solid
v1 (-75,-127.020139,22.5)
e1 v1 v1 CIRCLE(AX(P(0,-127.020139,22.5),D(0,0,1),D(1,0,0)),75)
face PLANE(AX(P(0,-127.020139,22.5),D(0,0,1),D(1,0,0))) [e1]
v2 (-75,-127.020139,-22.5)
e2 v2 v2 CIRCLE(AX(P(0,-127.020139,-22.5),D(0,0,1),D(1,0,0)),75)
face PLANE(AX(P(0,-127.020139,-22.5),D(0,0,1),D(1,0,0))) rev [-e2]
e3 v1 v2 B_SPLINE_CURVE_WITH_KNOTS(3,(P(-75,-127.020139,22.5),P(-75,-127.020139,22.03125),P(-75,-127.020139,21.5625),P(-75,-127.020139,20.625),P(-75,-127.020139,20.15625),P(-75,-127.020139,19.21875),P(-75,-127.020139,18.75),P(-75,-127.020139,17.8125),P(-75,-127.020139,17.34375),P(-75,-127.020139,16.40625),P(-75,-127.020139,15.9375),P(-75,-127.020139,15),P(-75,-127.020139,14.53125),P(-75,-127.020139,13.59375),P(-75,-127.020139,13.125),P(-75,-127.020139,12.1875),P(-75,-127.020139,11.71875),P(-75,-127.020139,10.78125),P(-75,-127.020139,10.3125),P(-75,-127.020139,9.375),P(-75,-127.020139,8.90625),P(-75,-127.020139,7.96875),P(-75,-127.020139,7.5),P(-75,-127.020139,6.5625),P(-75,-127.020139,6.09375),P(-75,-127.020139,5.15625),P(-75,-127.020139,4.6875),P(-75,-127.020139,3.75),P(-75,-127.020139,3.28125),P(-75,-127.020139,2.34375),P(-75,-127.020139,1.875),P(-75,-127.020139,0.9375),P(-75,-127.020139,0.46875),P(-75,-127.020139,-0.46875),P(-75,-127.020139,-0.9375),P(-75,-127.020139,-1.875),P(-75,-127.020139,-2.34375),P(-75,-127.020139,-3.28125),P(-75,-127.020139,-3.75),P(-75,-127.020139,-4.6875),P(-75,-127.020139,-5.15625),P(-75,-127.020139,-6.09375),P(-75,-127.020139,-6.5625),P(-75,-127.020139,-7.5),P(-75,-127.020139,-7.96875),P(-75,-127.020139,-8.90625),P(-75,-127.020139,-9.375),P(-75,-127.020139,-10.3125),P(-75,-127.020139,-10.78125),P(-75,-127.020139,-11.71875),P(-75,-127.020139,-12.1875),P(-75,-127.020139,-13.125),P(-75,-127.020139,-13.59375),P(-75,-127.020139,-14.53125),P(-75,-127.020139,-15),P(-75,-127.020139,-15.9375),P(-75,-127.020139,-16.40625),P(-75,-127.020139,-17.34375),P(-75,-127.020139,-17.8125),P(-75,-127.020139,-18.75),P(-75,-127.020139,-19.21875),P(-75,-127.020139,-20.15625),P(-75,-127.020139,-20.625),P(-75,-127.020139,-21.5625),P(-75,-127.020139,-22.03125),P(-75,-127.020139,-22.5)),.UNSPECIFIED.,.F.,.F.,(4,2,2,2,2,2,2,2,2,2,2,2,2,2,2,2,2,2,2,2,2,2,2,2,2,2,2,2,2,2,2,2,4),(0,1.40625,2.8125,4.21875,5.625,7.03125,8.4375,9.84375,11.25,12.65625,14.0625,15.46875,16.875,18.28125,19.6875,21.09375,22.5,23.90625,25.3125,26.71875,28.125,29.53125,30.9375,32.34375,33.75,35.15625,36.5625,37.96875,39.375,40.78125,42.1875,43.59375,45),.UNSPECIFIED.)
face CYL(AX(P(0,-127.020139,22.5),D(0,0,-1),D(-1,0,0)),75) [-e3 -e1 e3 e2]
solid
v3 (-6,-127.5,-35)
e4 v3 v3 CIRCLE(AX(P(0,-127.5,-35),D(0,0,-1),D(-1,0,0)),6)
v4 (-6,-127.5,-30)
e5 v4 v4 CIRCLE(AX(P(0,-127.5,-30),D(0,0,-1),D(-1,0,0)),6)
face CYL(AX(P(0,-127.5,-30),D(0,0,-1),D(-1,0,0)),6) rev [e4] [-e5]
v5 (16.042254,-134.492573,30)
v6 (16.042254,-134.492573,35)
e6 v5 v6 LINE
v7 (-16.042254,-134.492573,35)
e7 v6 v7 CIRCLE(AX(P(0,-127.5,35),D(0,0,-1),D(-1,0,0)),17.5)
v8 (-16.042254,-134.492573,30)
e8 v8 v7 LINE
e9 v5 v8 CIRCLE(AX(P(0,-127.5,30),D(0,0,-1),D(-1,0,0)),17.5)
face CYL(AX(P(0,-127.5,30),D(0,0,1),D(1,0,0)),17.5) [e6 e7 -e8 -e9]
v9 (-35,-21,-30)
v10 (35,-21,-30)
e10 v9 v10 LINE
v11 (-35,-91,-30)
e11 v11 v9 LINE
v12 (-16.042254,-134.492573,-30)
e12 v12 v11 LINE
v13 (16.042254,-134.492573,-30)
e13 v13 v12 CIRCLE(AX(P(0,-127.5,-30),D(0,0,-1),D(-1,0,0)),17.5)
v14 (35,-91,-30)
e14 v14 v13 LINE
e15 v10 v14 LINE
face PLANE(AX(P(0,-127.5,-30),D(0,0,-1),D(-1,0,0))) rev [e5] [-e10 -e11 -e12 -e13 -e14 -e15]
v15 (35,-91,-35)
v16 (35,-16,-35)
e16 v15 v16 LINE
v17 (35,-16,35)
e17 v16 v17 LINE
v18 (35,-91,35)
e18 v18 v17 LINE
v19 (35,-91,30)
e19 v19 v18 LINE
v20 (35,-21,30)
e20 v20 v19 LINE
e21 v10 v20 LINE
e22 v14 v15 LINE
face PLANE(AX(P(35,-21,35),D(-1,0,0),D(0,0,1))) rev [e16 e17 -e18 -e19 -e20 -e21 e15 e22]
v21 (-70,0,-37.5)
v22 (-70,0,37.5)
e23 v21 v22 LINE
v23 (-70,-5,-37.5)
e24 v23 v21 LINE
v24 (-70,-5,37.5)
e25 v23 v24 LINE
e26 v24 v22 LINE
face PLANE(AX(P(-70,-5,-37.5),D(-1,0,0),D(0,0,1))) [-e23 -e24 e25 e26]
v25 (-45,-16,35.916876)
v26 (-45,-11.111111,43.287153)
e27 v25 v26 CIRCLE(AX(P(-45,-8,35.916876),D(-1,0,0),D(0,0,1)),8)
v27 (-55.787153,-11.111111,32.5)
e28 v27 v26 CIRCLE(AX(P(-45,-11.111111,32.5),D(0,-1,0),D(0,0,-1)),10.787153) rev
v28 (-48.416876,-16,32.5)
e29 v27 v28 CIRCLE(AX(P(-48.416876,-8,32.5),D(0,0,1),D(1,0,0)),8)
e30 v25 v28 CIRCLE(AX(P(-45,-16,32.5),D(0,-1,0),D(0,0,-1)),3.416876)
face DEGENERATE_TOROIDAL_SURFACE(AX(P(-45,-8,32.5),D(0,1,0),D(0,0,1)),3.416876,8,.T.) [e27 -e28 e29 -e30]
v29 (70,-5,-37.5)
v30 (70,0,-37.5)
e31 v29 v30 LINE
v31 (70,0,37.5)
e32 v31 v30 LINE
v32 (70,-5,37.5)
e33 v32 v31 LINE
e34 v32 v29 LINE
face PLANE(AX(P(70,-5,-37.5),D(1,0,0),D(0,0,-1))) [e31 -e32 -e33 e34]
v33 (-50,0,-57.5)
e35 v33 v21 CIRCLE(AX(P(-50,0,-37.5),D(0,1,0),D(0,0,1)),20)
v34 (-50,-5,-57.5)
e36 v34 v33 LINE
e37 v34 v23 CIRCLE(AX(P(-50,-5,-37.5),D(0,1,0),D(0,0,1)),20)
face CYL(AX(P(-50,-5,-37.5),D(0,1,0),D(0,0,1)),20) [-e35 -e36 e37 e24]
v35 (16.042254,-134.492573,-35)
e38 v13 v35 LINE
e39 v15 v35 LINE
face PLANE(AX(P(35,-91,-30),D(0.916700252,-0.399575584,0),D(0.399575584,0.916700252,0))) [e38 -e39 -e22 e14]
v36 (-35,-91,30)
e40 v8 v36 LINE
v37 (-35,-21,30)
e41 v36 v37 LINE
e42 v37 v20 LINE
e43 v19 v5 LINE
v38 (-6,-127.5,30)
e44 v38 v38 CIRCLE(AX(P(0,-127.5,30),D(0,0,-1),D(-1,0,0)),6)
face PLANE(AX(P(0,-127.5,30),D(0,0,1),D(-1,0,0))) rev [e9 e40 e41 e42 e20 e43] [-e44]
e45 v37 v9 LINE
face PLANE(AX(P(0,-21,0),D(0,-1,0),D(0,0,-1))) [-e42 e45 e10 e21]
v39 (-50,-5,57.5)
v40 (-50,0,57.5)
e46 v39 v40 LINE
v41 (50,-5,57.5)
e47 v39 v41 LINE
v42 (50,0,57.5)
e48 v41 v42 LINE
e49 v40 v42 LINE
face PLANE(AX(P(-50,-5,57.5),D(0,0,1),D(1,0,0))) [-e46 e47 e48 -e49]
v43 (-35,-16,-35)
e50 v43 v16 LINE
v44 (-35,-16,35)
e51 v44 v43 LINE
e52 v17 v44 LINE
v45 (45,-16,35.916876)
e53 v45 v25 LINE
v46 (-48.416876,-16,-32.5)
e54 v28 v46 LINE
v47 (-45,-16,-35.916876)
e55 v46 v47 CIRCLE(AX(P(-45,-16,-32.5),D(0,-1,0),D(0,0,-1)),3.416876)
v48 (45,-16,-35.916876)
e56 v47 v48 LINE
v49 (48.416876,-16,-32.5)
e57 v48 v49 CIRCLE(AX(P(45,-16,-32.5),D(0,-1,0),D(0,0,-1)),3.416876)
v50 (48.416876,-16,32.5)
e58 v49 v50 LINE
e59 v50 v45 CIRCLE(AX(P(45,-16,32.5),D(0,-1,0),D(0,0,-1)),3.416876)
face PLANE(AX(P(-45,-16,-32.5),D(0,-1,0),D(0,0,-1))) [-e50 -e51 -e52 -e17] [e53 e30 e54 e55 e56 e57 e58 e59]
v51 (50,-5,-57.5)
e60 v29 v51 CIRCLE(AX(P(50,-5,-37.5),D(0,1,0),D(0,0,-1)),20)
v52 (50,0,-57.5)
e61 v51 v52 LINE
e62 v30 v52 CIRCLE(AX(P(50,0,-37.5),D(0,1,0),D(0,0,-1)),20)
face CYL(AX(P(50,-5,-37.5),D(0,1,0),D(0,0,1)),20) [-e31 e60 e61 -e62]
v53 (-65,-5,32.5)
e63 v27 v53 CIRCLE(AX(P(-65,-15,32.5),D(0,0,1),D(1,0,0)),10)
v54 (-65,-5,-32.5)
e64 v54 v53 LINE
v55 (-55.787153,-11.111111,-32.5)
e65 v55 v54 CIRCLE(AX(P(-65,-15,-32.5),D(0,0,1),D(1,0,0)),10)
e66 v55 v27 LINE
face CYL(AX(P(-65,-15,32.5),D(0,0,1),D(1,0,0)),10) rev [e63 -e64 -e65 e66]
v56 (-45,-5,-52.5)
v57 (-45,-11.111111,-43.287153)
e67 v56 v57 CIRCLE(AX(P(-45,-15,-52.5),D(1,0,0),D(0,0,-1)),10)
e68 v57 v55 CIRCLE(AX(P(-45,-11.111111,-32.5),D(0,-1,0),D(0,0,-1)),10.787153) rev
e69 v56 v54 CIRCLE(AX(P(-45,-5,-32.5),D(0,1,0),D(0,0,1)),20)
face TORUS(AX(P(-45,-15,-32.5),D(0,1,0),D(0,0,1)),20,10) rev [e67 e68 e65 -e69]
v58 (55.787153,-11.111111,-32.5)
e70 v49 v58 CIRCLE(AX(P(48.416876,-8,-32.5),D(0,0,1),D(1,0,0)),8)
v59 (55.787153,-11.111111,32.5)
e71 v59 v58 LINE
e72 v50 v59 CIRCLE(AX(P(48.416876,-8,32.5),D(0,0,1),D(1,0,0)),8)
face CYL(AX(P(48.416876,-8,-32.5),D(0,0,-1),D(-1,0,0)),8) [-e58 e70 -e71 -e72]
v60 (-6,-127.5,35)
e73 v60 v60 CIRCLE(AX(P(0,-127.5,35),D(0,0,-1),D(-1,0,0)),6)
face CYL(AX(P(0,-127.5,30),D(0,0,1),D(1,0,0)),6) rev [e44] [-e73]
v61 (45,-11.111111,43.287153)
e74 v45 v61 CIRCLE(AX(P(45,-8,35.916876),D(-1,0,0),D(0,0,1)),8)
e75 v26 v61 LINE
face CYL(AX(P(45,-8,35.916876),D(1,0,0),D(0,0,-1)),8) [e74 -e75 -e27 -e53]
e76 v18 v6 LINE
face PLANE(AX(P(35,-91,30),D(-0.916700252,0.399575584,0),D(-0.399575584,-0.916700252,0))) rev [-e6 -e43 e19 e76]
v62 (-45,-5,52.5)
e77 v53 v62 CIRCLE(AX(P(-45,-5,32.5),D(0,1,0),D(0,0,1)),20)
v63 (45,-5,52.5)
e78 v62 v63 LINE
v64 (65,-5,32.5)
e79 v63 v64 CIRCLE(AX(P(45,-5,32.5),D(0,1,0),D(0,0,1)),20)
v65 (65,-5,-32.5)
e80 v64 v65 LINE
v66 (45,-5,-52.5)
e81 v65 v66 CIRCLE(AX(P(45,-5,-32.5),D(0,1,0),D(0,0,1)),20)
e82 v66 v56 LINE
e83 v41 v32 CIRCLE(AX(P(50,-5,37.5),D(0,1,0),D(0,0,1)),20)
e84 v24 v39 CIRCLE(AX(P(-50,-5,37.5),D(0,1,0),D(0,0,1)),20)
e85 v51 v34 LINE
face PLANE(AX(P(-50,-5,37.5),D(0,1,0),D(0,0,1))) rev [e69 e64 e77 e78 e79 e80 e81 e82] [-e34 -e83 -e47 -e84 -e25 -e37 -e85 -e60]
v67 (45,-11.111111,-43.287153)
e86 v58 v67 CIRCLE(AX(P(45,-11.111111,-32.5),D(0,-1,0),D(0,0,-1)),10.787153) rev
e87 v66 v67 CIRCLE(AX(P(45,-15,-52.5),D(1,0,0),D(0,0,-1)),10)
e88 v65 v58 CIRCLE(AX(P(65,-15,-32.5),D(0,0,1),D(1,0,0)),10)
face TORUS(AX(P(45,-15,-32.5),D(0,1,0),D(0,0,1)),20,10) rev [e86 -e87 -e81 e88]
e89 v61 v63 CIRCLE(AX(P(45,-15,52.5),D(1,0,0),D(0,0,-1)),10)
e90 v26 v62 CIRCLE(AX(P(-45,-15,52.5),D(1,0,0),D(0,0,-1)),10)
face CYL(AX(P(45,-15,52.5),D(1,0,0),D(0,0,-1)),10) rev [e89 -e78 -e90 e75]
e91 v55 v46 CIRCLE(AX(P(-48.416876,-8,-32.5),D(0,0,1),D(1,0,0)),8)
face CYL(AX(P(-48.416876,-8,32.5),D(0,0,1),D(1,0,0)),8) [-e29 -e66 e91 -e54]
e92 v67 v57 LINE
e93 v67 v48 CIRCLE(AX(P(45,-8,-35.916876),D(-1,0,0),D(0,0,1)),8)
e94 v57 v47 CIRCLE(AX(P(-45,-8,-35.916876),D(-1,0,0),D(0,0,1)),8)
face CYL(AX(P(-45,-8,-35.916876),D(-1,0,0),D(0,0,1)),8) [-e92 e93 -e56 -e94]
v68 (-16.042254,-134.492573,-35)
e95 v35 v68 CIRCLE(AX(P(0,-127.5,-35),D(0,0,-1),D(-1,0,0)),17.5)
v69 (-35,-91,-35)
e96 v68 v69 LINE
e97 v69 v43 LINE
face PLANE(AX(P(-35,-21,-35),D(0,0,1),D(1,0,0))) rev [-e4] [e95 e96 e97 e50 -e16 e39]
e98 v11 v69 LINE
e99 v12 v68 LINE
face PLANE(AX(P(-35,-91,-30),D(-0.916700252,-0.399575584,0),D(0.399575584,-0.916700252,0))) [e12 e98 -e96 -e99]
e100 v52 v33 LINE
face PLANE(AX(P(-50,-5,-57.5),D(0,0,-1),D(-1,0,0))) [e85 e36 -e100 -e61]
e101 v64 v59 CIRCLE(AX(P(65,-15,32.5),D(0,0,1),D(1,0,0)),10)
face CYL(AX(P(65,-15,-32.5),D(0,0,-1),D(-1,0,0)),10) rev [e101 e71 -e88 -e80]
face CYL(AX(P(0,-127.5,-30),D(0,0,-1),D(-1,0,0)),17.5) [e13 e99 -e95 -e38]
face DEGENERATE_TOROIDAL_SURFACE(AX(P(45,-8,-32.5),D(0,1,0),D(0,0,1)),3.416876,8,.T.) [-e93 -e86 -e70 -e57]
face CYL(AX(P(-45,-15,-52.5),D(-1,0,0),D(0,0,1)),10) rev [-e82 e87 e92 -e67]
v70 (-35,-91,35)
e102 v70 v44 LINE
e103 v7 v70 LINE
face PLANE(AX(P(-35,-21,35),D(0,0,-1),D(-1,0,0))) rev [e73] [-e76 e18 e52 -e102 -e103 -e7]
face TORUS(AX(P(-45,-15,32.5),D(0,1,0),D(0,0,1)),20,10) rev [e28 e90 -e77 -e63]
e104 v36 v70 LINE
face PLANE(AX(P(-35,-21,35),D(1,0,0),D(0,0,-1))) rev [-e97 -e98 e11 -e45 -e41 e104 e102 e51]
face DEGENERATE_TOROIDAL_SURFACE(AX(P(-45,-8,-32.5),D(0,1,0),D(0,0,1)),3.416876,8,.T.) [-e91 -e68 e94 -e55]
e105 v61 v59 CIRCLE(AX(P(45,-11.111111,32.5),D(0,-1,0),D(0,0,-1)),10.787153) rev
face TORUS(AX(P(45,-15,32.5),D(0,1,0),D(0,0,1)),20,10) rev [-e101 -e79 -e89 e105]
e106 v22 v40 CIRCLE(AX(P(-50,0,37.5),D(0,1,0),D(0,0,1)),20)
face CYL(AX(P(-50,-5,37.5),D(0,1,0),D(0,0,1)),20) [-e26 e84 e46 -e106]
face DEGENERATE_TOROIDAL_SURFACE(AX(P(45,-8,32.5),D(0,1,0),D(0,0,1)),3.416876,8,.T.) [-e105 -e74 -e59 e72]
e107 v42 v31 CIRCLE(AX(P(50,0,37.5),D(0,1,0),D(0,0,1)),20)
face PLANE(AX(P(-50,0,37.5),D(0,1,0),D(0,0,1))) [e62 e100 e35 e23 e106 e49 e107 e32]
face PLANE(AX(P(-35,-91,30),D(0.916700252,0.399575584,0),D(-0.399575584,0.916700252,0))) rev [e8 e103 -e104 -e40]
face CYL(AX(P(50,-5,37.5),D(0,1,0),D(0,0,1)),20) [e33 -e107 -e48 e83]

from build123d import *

# Parameters (mm, degrees)
BOSS_EXTRUDE1_DEPTH = 5
BOSS_EXTRUDE2_DEPTH = 11
FILLET1_R           = 10
FILLET2_R           = 8
BOSS_EXTRUDE3_DEPTH = 5
SKETCH4_R           = 6.000000000000002
BOSS_EXTRUDE4_DEPTH = 5
SKETCH5_R           = 75.00000000000001
BOSS_EXTRUDE5_DEPTH = 22.5


with BuildPart() as part:
    # Sketch1 → Boss-Extrude1 (new body)
    with BuildSketch(Plane(origin=(0, 0, 0), x_dir=(1, 0, 0), z_dir=(0, 1, 0))):
        with BuildLine():
            Line((-49.999999999999865, 57.49999999999999), (49.99999999999988, 57.49999999999999))
            ThreePointArc((49.99999999999988, 57.49999999999999), (64.14213562373095, 51.642135623730944), (70, 37.499999999999865))
            Line((70, 37.499999999999865), (70.00000000000003, -37.49999999999986))
            ThreePointArc((70.00000000000003, -37.49999999999986), (64.14213562373098, -51.64213562373095), (49.99999999999989, -57.5))
            Line((49.99999999999989, -57.5), (-49.99999999999985, -57.5))
            ThreePointArc((-49.99999999999985, -57.5), (-64.14213562373095, -51.642135623730944), (-69.99999999999999, -37.49999999999986))
            Line((-69.99999999999999, -37.49999999999986), (-70, 37.49999999999985))
            ThreePointArc((-70, 37.49999999999985), (-64.14213562373095, 51.64213562373094), (-49.999999999999865, 57.49999999999999))
        make_face()
    extrude(amount=-BOSS_EXTRUDE1_DEPTH)

    # Sketch2 → Boss-Extrude2 (add)
    with BuildSketch(Plane.XZ.offset(5)):
        with BuildLine():
            Line((-54.999999999999986, 32.5), (-55.00000000000001, -32.49999999999999))
            ThreePointArc((-55.00000000000001, -32.49999999999999), (-52.07106781186548, -39.571067811865476), (-45, -42.49999999999999))
            Line((-45, -42.49999999999999), (45.000000000000014, -42.499999999999986))
            ThreePointArc((45.000000000000014, -42.499999999999986), (52.07106781186548, -39.57106781186546), (55.00000000000002, -32.5))
            Line((55.00000000000002, -32.5), (55.00000000000003, 32.5))
            ThreePointArc((55.00000000000003, 32.5), (52.07106781186551, 39.571067811865476), (45.000000000000036, 42.5))
            Line((45.000000000000036, 42.5), (-45, 42.49999999999999))
            ThreePointArc((-45, 42.49999999999999), (-52.07106781186546, 39.57106781186547), (-54.999999999999986, 32.5))
        make_face()
    extrude(amount=BOSS_EXTRUDE2_DEPTH)

    # Fillet1
    fillet1_edges = [part.edges().sort_by_distance(p)[0] for p in [
        (-52.07106781186548, -5, -39.571067811865476),
        (7.11e-15, -5, -42.499999999999986),
        (52.07106781186548, -5, -39.57106781186546),
        (55.00000000000003, -5, 0),
        (52.07106781186551, -5, 39.571067811865476),
        (2.132e-14, -5, 42.5),
        (-52.07106781186546, -5, 39.57106781186547),
        (-55, -5, 0),
    ]]
    fillet(fillet1_edges, radius=FILLET1_R)

    # Fillet2
    # the kernel refuses this fillet: 8 mm, written as the material it takes off along each edge
    with BuildSketch(Plane(origin=(-44.999999999999986, -16, 32.5), x_dir=(-1.42e-15, 0, 1), z_dir=(1, 0, 1.42e-15))) as fillet2_piece_1:
        with BuildLine():
            CenterArc((3.4168760482229885, -7.9999999999999964), FILLET2_R, 22.885380476158534, 67.11461952384147)
            Line((3.4168760482229885, 3.55e-15), (3.4168760482229885, 0.8000000000000043))
            Line((3.4168760482229885, 0.8000000000000043), (10, 0.8000000000000007))
            Line((10, 0.8000000000000007), (10.799999999999997, 0))
            ThreePointArc((10.799999999999997, 0), (10.799999999999997, -1.0000000000000053), (11.52418109131397, -4.577777777777779))
            Line((11.52418109131397, -4.577777777777779), (10.787153360123881, -4.888888888888889))
        make_face()
    revolve(axis=Axis((-44.999999999999986, -16, 32.5), (0, -1, 0)), revolution_arc=89.99999999999993, mode=Mode.SUBTRACT)
    with BuildSketch(Plane(origin=(45.000000000000036, -16, 42.5), x_dir=(0, 0.987284800910229, 0.15896138490730852), z_dir=(-1, 0, -8e-17))) as fillet2_piece_2:
        with BuildLine():
            CenterArc((6.8518159068908835, 7.771109299355987), FILLET2_R, 189.14661643898233, 67.11461952384138)
            Line((-1.0464625003909451, 6.499418220097512), (-1.8362903411191291, 6.372249112171666))
            Line((-1.8362903411191291, 6.372249112171666), (-0.7898278407281839, -0.12716910792584693))
            Line((-0.7898278407281839, -0.12716910792584693), (0.12716910792584638, -0.7898278407281804))
            ThreePointArc((0.12716910792584638, -0.7898278407281804), (1.1144539088360754, -0.6308664558208719), (4.761856359069408, -0.7771109299355986))
            Line((4.761856359069408, -0.7771109299355986), (4.9518526815986315, -1e-17))
        make_face()
    extrude(amount=90.00000000000003, mode=Mode.SUBTRACT)
    with BuildSketch(Plane(origin=(45.00000000000004, -16, 32.500000000000014), x_dir=(1, 0, -1.42e-15), z_dir=(-1.42e-15, 0, -1))) as fillet2_piece_3:
        with BuildLine():
            CenterArc((3.4168760482229814, -7.999999999999998), FILLET2_R, 22.885380476158563, 67.11461952384144)
            Line((3.4168760482229814, 0), (3.4168760482229814, 0.8000000000000007))
            Line((3.4168760482229814, 0.8000000000000007), (9.999999999999986, 0.8000000000000007))
            Line((9.999999999999986, 0.8000000000000007), (10.799999999999983, 0))
            ThreePointArc((10.799999999999983, 0), (10.799999999999983, -1.0000000000000018), (11.524181091313956, -4.5777777777777775))
            Line((11.524181091313956, -4.5777777777777775), (10.787153360123867, -4.888888888888889))
        make_face()
    revolve(axis=Axis((45.00000000000004, -16, 32.500000000000014), (0, -1, 0)), revolution_arc=90.00000000000013, mode=Mode.SUBTRACT)
    with BuildSketch(Plane(origin=(55.00000000000002, -16, -32.5), x_dir=(0.15896138490730993, 0.9872848009102289, 0), z_dir=(1.1e-16, 0, 1))) as fillet2_piece_4:
        with BuildLine():
            CenterArc((6.851815906890875, 7.771109299355992), FILLET2_R, 189.14661643898236, 67.1146195238415)
            Line((-1.0464625003909545, 6.499418220097512), (-1.8362903411191382, 6.372249112171664))
            Line((-1.8362903411191382, 6.372249112171664), (-0.7898278407281838, -0.12716910792584807))
            Line((-0.7898278407281838, -0.12716910792584807), (0.12716910792584749, -0.7898278407281802))
            ThreePointArc((0.12716910792584749, -0.7898278407281802), (1.1144539088360774, -0.6308664558208774), (4.7618563590694105, -0.7771109299355988))
            Line((4.7618563590694105, -0.7771109299355988), (4.951852681598634, 8e-17))
        make_face()
    extrude(amount=65, mode=Mode.SUBTRACT)
    with BuildSketch(Plane(origin=(45, -16, -32.499999999999964), x_dir=(1.42e-15, 0, -1), z_dir=(-1, 0, -1.42e-15))) as fillet2_piece_5:
        with BuildLine():
            CenterArc((3.416876048223024, -7.9999999999999964), FILLET2_R, 22.885380476158556, 67.1146195238415)
            Line((3.416876048223017, 3.55e-15), (3.416876048223017, 0.8000000000000043))
            Line((3.416876048223017, 0.8000000000000043), (10.000000000000021, 0.8000000000000007))
            Line((10.000000000000021, 0.8000000000000007), (10.800000000000018, 0))
            ThreePointArc((10.800000000000018, 0), (10.800000000000018, -1.0000000000000018), (11.524181091314006, -4.577777777777774))
            Line((11.524181091314006, -4.577777777777774), (10.787153360123916, -4.888888888888886))
        make_face()
    revolve(axis=Axis((45, -16, -32.499999999999964), (0, -1, 0)), revolution_arc=89.99999999999972, mode=Mode.SUBTRACT)
    with BuildSketch(Plane(origin=(-45, -16, -42.49999999999999), x_dir=(0, 0.987284800910229, -0.15896138490730852), z_dir=(1, 0, 8e-17))) as fillet2_piece_6:
        with BuildLine():
            CenterArc((6.8518159068908835, 7.771109299355987), FILLET2_R, 189.14661643898233, 67.11461952384138)
            Line((-1.0464625003909451, 6.499418220097512), (-1.8362903411191291, 6.372249112171666))
            Line((-1.8362903411191291, 6.372249112171666), (-0.7898278407281839, -0.12716910792584693))
            Line((-0.7898278407281839, -0.12716910792584693), (0.12716910792584638, -0.7898278407281804))
            ThreePointArc((0.12716910792584638, -0.7898278407281804), (1.1144539088360754, -0.6308664558208719), (4.761856359069408, -0.7771109299355986))
            Line((4.761856359069408, -0.7771109299355986), (4.9518526815986315, -1e-17))
        make_face()
    extrude(amount=90.00000000000001, mode=Mode.SUBTRACT)
    with BuildSketch(Plane(origin=(-45.000000000000014, -16, -32.50000000000001), x_dir=(-1, 0, 1.42e-15), z_dir=(1.42e-15, 0, 1))) as fillet2_piece_7:
        with BuildLine():
            CenterArc((3.4168760482229885, -7.999999999999998), FILLET2_R, 22.885380476158545, 67.11461952384145)
            Line((3.4168760482229885, 0), (3.4168760482229885, 0.8000000000000007))
            Line((3.4168760482229885, 0.8000000000000007), (9.999999999999986, 0.8000000000000007))
            Line((9.999999999999986, 0.8000000000000007), (10.799999999999983, 0))
            ThreePointArc((10.799999999999983, 0), (10.799999999999983, -1.0000000000000018), (11.52418109131397, -4.5777777777777775))
            Line((11.52418109131397, -4.5777777777777775), (10.787153360123881, -4.888888888888889))
        make_face()
    revolve(axis=Axis((-45.000000000000014, -16, -32.50000000000001), (0, -1, 0)), revolution_arc=90.00000000000017, mode=Mode.SUBTRACT)
    with BuildSketch(Plane(origin=(-54.999999999999986, -16, 32.5), x_dir=(-0.15896138490730852, 0.987284800910229, 0), z_dir=(-3.3e-16, 0, -1))) as fillet2_piece_8:
        with BuildLine():
            CenterArc((6.8518159068908835, 7.771109299355987), FILLET2_R, 189.14661643898228, 67.1146195238415)
            Line((-1.0464625003909462, 6.499418220097519), (-1.83629034111913, 6.372249112171672))
            Line((-1.83629034111913, 6.372249112171672), (-0.7898278407281839, -0.12716910792584693))
            Line((-0.7898278407281839, -0.12716910792584693), (0.12716910792584638, -0.7898278407281804))
            ThreePointArc((0.12716910792584638, -0.7898278407281804), (1.1144539088360754, -0.6308664558208719), (4.761856359069408, -0.7771109299355987))
            Line((4.761856359069408, -0.7771109299355987), (4.951852681598632, 4e-17))
        make_face()
    extrude(amount=65, mode=Mode.SUBTRACT)

    # Sketch3 → Boss-Extrude3 (add)
    with BuildSketch(Plane.XZ.offset(16)):
        Polygon((-35.00000000000001, 35), (34.99999999999999, 35), (34.99999999999999, -35), (-35, -35), align=None)
    extrude(amount=BOSS_EXTRUDE3_DEPTH)

    # Sketch4 → Boss-Extrude4 (add)
    with BuildSketch(Plane(origin=(0, 0, -35), x_dir=(-1, 0, 0), z_dir=(0, 0, -1))):
        with BuildLine():
            Line((-34.99999999999999, -21), (-34.999999999999986, -91.00000000000001))
            Line((-34.999999999999986, -91.00000000000001), (-16.042254413814177, -134.49257272557526))
            ThreePointArc((-16.042254413814177, -134.49257272557526), (1.925e-14, -145), (16.04225441381421, -134.49257272557526))
            Line((16.04225441381421, -134.49257272557526), (35.00000000000001, -91))
            Line((35.00000000000001, -91), (35, -21))
            Line((35, -21), (-34.99999999999999, -21))
        make_face()
        with Locations((1.818e-14, -127.5)):
            Circle(SKETCH4_R, mode=Mode.SUBTRACT)
    boss_extrude4 = extrude(amount=-BOSS_EXTRUDE4_DEPTH)

    # Mirror1: Boss-Extrude4 across plane
    add(boss_extrude4.mirror(Plane.XY))


with BuildPart() as body_2:
    # Sketch5 → Boss-Extrude5 (new, symmetric)
    with BuildSketch(Plane.XY):
        with Locations(Location((0, -127.02013928772499, 0), (0, 0, 180))):
            Circle(SKETCH5_R)
    extrude(amount=BOSS_EXTRUDE5_DEPTH, both=True)


solid = Compound([part.part, body_2.part])
